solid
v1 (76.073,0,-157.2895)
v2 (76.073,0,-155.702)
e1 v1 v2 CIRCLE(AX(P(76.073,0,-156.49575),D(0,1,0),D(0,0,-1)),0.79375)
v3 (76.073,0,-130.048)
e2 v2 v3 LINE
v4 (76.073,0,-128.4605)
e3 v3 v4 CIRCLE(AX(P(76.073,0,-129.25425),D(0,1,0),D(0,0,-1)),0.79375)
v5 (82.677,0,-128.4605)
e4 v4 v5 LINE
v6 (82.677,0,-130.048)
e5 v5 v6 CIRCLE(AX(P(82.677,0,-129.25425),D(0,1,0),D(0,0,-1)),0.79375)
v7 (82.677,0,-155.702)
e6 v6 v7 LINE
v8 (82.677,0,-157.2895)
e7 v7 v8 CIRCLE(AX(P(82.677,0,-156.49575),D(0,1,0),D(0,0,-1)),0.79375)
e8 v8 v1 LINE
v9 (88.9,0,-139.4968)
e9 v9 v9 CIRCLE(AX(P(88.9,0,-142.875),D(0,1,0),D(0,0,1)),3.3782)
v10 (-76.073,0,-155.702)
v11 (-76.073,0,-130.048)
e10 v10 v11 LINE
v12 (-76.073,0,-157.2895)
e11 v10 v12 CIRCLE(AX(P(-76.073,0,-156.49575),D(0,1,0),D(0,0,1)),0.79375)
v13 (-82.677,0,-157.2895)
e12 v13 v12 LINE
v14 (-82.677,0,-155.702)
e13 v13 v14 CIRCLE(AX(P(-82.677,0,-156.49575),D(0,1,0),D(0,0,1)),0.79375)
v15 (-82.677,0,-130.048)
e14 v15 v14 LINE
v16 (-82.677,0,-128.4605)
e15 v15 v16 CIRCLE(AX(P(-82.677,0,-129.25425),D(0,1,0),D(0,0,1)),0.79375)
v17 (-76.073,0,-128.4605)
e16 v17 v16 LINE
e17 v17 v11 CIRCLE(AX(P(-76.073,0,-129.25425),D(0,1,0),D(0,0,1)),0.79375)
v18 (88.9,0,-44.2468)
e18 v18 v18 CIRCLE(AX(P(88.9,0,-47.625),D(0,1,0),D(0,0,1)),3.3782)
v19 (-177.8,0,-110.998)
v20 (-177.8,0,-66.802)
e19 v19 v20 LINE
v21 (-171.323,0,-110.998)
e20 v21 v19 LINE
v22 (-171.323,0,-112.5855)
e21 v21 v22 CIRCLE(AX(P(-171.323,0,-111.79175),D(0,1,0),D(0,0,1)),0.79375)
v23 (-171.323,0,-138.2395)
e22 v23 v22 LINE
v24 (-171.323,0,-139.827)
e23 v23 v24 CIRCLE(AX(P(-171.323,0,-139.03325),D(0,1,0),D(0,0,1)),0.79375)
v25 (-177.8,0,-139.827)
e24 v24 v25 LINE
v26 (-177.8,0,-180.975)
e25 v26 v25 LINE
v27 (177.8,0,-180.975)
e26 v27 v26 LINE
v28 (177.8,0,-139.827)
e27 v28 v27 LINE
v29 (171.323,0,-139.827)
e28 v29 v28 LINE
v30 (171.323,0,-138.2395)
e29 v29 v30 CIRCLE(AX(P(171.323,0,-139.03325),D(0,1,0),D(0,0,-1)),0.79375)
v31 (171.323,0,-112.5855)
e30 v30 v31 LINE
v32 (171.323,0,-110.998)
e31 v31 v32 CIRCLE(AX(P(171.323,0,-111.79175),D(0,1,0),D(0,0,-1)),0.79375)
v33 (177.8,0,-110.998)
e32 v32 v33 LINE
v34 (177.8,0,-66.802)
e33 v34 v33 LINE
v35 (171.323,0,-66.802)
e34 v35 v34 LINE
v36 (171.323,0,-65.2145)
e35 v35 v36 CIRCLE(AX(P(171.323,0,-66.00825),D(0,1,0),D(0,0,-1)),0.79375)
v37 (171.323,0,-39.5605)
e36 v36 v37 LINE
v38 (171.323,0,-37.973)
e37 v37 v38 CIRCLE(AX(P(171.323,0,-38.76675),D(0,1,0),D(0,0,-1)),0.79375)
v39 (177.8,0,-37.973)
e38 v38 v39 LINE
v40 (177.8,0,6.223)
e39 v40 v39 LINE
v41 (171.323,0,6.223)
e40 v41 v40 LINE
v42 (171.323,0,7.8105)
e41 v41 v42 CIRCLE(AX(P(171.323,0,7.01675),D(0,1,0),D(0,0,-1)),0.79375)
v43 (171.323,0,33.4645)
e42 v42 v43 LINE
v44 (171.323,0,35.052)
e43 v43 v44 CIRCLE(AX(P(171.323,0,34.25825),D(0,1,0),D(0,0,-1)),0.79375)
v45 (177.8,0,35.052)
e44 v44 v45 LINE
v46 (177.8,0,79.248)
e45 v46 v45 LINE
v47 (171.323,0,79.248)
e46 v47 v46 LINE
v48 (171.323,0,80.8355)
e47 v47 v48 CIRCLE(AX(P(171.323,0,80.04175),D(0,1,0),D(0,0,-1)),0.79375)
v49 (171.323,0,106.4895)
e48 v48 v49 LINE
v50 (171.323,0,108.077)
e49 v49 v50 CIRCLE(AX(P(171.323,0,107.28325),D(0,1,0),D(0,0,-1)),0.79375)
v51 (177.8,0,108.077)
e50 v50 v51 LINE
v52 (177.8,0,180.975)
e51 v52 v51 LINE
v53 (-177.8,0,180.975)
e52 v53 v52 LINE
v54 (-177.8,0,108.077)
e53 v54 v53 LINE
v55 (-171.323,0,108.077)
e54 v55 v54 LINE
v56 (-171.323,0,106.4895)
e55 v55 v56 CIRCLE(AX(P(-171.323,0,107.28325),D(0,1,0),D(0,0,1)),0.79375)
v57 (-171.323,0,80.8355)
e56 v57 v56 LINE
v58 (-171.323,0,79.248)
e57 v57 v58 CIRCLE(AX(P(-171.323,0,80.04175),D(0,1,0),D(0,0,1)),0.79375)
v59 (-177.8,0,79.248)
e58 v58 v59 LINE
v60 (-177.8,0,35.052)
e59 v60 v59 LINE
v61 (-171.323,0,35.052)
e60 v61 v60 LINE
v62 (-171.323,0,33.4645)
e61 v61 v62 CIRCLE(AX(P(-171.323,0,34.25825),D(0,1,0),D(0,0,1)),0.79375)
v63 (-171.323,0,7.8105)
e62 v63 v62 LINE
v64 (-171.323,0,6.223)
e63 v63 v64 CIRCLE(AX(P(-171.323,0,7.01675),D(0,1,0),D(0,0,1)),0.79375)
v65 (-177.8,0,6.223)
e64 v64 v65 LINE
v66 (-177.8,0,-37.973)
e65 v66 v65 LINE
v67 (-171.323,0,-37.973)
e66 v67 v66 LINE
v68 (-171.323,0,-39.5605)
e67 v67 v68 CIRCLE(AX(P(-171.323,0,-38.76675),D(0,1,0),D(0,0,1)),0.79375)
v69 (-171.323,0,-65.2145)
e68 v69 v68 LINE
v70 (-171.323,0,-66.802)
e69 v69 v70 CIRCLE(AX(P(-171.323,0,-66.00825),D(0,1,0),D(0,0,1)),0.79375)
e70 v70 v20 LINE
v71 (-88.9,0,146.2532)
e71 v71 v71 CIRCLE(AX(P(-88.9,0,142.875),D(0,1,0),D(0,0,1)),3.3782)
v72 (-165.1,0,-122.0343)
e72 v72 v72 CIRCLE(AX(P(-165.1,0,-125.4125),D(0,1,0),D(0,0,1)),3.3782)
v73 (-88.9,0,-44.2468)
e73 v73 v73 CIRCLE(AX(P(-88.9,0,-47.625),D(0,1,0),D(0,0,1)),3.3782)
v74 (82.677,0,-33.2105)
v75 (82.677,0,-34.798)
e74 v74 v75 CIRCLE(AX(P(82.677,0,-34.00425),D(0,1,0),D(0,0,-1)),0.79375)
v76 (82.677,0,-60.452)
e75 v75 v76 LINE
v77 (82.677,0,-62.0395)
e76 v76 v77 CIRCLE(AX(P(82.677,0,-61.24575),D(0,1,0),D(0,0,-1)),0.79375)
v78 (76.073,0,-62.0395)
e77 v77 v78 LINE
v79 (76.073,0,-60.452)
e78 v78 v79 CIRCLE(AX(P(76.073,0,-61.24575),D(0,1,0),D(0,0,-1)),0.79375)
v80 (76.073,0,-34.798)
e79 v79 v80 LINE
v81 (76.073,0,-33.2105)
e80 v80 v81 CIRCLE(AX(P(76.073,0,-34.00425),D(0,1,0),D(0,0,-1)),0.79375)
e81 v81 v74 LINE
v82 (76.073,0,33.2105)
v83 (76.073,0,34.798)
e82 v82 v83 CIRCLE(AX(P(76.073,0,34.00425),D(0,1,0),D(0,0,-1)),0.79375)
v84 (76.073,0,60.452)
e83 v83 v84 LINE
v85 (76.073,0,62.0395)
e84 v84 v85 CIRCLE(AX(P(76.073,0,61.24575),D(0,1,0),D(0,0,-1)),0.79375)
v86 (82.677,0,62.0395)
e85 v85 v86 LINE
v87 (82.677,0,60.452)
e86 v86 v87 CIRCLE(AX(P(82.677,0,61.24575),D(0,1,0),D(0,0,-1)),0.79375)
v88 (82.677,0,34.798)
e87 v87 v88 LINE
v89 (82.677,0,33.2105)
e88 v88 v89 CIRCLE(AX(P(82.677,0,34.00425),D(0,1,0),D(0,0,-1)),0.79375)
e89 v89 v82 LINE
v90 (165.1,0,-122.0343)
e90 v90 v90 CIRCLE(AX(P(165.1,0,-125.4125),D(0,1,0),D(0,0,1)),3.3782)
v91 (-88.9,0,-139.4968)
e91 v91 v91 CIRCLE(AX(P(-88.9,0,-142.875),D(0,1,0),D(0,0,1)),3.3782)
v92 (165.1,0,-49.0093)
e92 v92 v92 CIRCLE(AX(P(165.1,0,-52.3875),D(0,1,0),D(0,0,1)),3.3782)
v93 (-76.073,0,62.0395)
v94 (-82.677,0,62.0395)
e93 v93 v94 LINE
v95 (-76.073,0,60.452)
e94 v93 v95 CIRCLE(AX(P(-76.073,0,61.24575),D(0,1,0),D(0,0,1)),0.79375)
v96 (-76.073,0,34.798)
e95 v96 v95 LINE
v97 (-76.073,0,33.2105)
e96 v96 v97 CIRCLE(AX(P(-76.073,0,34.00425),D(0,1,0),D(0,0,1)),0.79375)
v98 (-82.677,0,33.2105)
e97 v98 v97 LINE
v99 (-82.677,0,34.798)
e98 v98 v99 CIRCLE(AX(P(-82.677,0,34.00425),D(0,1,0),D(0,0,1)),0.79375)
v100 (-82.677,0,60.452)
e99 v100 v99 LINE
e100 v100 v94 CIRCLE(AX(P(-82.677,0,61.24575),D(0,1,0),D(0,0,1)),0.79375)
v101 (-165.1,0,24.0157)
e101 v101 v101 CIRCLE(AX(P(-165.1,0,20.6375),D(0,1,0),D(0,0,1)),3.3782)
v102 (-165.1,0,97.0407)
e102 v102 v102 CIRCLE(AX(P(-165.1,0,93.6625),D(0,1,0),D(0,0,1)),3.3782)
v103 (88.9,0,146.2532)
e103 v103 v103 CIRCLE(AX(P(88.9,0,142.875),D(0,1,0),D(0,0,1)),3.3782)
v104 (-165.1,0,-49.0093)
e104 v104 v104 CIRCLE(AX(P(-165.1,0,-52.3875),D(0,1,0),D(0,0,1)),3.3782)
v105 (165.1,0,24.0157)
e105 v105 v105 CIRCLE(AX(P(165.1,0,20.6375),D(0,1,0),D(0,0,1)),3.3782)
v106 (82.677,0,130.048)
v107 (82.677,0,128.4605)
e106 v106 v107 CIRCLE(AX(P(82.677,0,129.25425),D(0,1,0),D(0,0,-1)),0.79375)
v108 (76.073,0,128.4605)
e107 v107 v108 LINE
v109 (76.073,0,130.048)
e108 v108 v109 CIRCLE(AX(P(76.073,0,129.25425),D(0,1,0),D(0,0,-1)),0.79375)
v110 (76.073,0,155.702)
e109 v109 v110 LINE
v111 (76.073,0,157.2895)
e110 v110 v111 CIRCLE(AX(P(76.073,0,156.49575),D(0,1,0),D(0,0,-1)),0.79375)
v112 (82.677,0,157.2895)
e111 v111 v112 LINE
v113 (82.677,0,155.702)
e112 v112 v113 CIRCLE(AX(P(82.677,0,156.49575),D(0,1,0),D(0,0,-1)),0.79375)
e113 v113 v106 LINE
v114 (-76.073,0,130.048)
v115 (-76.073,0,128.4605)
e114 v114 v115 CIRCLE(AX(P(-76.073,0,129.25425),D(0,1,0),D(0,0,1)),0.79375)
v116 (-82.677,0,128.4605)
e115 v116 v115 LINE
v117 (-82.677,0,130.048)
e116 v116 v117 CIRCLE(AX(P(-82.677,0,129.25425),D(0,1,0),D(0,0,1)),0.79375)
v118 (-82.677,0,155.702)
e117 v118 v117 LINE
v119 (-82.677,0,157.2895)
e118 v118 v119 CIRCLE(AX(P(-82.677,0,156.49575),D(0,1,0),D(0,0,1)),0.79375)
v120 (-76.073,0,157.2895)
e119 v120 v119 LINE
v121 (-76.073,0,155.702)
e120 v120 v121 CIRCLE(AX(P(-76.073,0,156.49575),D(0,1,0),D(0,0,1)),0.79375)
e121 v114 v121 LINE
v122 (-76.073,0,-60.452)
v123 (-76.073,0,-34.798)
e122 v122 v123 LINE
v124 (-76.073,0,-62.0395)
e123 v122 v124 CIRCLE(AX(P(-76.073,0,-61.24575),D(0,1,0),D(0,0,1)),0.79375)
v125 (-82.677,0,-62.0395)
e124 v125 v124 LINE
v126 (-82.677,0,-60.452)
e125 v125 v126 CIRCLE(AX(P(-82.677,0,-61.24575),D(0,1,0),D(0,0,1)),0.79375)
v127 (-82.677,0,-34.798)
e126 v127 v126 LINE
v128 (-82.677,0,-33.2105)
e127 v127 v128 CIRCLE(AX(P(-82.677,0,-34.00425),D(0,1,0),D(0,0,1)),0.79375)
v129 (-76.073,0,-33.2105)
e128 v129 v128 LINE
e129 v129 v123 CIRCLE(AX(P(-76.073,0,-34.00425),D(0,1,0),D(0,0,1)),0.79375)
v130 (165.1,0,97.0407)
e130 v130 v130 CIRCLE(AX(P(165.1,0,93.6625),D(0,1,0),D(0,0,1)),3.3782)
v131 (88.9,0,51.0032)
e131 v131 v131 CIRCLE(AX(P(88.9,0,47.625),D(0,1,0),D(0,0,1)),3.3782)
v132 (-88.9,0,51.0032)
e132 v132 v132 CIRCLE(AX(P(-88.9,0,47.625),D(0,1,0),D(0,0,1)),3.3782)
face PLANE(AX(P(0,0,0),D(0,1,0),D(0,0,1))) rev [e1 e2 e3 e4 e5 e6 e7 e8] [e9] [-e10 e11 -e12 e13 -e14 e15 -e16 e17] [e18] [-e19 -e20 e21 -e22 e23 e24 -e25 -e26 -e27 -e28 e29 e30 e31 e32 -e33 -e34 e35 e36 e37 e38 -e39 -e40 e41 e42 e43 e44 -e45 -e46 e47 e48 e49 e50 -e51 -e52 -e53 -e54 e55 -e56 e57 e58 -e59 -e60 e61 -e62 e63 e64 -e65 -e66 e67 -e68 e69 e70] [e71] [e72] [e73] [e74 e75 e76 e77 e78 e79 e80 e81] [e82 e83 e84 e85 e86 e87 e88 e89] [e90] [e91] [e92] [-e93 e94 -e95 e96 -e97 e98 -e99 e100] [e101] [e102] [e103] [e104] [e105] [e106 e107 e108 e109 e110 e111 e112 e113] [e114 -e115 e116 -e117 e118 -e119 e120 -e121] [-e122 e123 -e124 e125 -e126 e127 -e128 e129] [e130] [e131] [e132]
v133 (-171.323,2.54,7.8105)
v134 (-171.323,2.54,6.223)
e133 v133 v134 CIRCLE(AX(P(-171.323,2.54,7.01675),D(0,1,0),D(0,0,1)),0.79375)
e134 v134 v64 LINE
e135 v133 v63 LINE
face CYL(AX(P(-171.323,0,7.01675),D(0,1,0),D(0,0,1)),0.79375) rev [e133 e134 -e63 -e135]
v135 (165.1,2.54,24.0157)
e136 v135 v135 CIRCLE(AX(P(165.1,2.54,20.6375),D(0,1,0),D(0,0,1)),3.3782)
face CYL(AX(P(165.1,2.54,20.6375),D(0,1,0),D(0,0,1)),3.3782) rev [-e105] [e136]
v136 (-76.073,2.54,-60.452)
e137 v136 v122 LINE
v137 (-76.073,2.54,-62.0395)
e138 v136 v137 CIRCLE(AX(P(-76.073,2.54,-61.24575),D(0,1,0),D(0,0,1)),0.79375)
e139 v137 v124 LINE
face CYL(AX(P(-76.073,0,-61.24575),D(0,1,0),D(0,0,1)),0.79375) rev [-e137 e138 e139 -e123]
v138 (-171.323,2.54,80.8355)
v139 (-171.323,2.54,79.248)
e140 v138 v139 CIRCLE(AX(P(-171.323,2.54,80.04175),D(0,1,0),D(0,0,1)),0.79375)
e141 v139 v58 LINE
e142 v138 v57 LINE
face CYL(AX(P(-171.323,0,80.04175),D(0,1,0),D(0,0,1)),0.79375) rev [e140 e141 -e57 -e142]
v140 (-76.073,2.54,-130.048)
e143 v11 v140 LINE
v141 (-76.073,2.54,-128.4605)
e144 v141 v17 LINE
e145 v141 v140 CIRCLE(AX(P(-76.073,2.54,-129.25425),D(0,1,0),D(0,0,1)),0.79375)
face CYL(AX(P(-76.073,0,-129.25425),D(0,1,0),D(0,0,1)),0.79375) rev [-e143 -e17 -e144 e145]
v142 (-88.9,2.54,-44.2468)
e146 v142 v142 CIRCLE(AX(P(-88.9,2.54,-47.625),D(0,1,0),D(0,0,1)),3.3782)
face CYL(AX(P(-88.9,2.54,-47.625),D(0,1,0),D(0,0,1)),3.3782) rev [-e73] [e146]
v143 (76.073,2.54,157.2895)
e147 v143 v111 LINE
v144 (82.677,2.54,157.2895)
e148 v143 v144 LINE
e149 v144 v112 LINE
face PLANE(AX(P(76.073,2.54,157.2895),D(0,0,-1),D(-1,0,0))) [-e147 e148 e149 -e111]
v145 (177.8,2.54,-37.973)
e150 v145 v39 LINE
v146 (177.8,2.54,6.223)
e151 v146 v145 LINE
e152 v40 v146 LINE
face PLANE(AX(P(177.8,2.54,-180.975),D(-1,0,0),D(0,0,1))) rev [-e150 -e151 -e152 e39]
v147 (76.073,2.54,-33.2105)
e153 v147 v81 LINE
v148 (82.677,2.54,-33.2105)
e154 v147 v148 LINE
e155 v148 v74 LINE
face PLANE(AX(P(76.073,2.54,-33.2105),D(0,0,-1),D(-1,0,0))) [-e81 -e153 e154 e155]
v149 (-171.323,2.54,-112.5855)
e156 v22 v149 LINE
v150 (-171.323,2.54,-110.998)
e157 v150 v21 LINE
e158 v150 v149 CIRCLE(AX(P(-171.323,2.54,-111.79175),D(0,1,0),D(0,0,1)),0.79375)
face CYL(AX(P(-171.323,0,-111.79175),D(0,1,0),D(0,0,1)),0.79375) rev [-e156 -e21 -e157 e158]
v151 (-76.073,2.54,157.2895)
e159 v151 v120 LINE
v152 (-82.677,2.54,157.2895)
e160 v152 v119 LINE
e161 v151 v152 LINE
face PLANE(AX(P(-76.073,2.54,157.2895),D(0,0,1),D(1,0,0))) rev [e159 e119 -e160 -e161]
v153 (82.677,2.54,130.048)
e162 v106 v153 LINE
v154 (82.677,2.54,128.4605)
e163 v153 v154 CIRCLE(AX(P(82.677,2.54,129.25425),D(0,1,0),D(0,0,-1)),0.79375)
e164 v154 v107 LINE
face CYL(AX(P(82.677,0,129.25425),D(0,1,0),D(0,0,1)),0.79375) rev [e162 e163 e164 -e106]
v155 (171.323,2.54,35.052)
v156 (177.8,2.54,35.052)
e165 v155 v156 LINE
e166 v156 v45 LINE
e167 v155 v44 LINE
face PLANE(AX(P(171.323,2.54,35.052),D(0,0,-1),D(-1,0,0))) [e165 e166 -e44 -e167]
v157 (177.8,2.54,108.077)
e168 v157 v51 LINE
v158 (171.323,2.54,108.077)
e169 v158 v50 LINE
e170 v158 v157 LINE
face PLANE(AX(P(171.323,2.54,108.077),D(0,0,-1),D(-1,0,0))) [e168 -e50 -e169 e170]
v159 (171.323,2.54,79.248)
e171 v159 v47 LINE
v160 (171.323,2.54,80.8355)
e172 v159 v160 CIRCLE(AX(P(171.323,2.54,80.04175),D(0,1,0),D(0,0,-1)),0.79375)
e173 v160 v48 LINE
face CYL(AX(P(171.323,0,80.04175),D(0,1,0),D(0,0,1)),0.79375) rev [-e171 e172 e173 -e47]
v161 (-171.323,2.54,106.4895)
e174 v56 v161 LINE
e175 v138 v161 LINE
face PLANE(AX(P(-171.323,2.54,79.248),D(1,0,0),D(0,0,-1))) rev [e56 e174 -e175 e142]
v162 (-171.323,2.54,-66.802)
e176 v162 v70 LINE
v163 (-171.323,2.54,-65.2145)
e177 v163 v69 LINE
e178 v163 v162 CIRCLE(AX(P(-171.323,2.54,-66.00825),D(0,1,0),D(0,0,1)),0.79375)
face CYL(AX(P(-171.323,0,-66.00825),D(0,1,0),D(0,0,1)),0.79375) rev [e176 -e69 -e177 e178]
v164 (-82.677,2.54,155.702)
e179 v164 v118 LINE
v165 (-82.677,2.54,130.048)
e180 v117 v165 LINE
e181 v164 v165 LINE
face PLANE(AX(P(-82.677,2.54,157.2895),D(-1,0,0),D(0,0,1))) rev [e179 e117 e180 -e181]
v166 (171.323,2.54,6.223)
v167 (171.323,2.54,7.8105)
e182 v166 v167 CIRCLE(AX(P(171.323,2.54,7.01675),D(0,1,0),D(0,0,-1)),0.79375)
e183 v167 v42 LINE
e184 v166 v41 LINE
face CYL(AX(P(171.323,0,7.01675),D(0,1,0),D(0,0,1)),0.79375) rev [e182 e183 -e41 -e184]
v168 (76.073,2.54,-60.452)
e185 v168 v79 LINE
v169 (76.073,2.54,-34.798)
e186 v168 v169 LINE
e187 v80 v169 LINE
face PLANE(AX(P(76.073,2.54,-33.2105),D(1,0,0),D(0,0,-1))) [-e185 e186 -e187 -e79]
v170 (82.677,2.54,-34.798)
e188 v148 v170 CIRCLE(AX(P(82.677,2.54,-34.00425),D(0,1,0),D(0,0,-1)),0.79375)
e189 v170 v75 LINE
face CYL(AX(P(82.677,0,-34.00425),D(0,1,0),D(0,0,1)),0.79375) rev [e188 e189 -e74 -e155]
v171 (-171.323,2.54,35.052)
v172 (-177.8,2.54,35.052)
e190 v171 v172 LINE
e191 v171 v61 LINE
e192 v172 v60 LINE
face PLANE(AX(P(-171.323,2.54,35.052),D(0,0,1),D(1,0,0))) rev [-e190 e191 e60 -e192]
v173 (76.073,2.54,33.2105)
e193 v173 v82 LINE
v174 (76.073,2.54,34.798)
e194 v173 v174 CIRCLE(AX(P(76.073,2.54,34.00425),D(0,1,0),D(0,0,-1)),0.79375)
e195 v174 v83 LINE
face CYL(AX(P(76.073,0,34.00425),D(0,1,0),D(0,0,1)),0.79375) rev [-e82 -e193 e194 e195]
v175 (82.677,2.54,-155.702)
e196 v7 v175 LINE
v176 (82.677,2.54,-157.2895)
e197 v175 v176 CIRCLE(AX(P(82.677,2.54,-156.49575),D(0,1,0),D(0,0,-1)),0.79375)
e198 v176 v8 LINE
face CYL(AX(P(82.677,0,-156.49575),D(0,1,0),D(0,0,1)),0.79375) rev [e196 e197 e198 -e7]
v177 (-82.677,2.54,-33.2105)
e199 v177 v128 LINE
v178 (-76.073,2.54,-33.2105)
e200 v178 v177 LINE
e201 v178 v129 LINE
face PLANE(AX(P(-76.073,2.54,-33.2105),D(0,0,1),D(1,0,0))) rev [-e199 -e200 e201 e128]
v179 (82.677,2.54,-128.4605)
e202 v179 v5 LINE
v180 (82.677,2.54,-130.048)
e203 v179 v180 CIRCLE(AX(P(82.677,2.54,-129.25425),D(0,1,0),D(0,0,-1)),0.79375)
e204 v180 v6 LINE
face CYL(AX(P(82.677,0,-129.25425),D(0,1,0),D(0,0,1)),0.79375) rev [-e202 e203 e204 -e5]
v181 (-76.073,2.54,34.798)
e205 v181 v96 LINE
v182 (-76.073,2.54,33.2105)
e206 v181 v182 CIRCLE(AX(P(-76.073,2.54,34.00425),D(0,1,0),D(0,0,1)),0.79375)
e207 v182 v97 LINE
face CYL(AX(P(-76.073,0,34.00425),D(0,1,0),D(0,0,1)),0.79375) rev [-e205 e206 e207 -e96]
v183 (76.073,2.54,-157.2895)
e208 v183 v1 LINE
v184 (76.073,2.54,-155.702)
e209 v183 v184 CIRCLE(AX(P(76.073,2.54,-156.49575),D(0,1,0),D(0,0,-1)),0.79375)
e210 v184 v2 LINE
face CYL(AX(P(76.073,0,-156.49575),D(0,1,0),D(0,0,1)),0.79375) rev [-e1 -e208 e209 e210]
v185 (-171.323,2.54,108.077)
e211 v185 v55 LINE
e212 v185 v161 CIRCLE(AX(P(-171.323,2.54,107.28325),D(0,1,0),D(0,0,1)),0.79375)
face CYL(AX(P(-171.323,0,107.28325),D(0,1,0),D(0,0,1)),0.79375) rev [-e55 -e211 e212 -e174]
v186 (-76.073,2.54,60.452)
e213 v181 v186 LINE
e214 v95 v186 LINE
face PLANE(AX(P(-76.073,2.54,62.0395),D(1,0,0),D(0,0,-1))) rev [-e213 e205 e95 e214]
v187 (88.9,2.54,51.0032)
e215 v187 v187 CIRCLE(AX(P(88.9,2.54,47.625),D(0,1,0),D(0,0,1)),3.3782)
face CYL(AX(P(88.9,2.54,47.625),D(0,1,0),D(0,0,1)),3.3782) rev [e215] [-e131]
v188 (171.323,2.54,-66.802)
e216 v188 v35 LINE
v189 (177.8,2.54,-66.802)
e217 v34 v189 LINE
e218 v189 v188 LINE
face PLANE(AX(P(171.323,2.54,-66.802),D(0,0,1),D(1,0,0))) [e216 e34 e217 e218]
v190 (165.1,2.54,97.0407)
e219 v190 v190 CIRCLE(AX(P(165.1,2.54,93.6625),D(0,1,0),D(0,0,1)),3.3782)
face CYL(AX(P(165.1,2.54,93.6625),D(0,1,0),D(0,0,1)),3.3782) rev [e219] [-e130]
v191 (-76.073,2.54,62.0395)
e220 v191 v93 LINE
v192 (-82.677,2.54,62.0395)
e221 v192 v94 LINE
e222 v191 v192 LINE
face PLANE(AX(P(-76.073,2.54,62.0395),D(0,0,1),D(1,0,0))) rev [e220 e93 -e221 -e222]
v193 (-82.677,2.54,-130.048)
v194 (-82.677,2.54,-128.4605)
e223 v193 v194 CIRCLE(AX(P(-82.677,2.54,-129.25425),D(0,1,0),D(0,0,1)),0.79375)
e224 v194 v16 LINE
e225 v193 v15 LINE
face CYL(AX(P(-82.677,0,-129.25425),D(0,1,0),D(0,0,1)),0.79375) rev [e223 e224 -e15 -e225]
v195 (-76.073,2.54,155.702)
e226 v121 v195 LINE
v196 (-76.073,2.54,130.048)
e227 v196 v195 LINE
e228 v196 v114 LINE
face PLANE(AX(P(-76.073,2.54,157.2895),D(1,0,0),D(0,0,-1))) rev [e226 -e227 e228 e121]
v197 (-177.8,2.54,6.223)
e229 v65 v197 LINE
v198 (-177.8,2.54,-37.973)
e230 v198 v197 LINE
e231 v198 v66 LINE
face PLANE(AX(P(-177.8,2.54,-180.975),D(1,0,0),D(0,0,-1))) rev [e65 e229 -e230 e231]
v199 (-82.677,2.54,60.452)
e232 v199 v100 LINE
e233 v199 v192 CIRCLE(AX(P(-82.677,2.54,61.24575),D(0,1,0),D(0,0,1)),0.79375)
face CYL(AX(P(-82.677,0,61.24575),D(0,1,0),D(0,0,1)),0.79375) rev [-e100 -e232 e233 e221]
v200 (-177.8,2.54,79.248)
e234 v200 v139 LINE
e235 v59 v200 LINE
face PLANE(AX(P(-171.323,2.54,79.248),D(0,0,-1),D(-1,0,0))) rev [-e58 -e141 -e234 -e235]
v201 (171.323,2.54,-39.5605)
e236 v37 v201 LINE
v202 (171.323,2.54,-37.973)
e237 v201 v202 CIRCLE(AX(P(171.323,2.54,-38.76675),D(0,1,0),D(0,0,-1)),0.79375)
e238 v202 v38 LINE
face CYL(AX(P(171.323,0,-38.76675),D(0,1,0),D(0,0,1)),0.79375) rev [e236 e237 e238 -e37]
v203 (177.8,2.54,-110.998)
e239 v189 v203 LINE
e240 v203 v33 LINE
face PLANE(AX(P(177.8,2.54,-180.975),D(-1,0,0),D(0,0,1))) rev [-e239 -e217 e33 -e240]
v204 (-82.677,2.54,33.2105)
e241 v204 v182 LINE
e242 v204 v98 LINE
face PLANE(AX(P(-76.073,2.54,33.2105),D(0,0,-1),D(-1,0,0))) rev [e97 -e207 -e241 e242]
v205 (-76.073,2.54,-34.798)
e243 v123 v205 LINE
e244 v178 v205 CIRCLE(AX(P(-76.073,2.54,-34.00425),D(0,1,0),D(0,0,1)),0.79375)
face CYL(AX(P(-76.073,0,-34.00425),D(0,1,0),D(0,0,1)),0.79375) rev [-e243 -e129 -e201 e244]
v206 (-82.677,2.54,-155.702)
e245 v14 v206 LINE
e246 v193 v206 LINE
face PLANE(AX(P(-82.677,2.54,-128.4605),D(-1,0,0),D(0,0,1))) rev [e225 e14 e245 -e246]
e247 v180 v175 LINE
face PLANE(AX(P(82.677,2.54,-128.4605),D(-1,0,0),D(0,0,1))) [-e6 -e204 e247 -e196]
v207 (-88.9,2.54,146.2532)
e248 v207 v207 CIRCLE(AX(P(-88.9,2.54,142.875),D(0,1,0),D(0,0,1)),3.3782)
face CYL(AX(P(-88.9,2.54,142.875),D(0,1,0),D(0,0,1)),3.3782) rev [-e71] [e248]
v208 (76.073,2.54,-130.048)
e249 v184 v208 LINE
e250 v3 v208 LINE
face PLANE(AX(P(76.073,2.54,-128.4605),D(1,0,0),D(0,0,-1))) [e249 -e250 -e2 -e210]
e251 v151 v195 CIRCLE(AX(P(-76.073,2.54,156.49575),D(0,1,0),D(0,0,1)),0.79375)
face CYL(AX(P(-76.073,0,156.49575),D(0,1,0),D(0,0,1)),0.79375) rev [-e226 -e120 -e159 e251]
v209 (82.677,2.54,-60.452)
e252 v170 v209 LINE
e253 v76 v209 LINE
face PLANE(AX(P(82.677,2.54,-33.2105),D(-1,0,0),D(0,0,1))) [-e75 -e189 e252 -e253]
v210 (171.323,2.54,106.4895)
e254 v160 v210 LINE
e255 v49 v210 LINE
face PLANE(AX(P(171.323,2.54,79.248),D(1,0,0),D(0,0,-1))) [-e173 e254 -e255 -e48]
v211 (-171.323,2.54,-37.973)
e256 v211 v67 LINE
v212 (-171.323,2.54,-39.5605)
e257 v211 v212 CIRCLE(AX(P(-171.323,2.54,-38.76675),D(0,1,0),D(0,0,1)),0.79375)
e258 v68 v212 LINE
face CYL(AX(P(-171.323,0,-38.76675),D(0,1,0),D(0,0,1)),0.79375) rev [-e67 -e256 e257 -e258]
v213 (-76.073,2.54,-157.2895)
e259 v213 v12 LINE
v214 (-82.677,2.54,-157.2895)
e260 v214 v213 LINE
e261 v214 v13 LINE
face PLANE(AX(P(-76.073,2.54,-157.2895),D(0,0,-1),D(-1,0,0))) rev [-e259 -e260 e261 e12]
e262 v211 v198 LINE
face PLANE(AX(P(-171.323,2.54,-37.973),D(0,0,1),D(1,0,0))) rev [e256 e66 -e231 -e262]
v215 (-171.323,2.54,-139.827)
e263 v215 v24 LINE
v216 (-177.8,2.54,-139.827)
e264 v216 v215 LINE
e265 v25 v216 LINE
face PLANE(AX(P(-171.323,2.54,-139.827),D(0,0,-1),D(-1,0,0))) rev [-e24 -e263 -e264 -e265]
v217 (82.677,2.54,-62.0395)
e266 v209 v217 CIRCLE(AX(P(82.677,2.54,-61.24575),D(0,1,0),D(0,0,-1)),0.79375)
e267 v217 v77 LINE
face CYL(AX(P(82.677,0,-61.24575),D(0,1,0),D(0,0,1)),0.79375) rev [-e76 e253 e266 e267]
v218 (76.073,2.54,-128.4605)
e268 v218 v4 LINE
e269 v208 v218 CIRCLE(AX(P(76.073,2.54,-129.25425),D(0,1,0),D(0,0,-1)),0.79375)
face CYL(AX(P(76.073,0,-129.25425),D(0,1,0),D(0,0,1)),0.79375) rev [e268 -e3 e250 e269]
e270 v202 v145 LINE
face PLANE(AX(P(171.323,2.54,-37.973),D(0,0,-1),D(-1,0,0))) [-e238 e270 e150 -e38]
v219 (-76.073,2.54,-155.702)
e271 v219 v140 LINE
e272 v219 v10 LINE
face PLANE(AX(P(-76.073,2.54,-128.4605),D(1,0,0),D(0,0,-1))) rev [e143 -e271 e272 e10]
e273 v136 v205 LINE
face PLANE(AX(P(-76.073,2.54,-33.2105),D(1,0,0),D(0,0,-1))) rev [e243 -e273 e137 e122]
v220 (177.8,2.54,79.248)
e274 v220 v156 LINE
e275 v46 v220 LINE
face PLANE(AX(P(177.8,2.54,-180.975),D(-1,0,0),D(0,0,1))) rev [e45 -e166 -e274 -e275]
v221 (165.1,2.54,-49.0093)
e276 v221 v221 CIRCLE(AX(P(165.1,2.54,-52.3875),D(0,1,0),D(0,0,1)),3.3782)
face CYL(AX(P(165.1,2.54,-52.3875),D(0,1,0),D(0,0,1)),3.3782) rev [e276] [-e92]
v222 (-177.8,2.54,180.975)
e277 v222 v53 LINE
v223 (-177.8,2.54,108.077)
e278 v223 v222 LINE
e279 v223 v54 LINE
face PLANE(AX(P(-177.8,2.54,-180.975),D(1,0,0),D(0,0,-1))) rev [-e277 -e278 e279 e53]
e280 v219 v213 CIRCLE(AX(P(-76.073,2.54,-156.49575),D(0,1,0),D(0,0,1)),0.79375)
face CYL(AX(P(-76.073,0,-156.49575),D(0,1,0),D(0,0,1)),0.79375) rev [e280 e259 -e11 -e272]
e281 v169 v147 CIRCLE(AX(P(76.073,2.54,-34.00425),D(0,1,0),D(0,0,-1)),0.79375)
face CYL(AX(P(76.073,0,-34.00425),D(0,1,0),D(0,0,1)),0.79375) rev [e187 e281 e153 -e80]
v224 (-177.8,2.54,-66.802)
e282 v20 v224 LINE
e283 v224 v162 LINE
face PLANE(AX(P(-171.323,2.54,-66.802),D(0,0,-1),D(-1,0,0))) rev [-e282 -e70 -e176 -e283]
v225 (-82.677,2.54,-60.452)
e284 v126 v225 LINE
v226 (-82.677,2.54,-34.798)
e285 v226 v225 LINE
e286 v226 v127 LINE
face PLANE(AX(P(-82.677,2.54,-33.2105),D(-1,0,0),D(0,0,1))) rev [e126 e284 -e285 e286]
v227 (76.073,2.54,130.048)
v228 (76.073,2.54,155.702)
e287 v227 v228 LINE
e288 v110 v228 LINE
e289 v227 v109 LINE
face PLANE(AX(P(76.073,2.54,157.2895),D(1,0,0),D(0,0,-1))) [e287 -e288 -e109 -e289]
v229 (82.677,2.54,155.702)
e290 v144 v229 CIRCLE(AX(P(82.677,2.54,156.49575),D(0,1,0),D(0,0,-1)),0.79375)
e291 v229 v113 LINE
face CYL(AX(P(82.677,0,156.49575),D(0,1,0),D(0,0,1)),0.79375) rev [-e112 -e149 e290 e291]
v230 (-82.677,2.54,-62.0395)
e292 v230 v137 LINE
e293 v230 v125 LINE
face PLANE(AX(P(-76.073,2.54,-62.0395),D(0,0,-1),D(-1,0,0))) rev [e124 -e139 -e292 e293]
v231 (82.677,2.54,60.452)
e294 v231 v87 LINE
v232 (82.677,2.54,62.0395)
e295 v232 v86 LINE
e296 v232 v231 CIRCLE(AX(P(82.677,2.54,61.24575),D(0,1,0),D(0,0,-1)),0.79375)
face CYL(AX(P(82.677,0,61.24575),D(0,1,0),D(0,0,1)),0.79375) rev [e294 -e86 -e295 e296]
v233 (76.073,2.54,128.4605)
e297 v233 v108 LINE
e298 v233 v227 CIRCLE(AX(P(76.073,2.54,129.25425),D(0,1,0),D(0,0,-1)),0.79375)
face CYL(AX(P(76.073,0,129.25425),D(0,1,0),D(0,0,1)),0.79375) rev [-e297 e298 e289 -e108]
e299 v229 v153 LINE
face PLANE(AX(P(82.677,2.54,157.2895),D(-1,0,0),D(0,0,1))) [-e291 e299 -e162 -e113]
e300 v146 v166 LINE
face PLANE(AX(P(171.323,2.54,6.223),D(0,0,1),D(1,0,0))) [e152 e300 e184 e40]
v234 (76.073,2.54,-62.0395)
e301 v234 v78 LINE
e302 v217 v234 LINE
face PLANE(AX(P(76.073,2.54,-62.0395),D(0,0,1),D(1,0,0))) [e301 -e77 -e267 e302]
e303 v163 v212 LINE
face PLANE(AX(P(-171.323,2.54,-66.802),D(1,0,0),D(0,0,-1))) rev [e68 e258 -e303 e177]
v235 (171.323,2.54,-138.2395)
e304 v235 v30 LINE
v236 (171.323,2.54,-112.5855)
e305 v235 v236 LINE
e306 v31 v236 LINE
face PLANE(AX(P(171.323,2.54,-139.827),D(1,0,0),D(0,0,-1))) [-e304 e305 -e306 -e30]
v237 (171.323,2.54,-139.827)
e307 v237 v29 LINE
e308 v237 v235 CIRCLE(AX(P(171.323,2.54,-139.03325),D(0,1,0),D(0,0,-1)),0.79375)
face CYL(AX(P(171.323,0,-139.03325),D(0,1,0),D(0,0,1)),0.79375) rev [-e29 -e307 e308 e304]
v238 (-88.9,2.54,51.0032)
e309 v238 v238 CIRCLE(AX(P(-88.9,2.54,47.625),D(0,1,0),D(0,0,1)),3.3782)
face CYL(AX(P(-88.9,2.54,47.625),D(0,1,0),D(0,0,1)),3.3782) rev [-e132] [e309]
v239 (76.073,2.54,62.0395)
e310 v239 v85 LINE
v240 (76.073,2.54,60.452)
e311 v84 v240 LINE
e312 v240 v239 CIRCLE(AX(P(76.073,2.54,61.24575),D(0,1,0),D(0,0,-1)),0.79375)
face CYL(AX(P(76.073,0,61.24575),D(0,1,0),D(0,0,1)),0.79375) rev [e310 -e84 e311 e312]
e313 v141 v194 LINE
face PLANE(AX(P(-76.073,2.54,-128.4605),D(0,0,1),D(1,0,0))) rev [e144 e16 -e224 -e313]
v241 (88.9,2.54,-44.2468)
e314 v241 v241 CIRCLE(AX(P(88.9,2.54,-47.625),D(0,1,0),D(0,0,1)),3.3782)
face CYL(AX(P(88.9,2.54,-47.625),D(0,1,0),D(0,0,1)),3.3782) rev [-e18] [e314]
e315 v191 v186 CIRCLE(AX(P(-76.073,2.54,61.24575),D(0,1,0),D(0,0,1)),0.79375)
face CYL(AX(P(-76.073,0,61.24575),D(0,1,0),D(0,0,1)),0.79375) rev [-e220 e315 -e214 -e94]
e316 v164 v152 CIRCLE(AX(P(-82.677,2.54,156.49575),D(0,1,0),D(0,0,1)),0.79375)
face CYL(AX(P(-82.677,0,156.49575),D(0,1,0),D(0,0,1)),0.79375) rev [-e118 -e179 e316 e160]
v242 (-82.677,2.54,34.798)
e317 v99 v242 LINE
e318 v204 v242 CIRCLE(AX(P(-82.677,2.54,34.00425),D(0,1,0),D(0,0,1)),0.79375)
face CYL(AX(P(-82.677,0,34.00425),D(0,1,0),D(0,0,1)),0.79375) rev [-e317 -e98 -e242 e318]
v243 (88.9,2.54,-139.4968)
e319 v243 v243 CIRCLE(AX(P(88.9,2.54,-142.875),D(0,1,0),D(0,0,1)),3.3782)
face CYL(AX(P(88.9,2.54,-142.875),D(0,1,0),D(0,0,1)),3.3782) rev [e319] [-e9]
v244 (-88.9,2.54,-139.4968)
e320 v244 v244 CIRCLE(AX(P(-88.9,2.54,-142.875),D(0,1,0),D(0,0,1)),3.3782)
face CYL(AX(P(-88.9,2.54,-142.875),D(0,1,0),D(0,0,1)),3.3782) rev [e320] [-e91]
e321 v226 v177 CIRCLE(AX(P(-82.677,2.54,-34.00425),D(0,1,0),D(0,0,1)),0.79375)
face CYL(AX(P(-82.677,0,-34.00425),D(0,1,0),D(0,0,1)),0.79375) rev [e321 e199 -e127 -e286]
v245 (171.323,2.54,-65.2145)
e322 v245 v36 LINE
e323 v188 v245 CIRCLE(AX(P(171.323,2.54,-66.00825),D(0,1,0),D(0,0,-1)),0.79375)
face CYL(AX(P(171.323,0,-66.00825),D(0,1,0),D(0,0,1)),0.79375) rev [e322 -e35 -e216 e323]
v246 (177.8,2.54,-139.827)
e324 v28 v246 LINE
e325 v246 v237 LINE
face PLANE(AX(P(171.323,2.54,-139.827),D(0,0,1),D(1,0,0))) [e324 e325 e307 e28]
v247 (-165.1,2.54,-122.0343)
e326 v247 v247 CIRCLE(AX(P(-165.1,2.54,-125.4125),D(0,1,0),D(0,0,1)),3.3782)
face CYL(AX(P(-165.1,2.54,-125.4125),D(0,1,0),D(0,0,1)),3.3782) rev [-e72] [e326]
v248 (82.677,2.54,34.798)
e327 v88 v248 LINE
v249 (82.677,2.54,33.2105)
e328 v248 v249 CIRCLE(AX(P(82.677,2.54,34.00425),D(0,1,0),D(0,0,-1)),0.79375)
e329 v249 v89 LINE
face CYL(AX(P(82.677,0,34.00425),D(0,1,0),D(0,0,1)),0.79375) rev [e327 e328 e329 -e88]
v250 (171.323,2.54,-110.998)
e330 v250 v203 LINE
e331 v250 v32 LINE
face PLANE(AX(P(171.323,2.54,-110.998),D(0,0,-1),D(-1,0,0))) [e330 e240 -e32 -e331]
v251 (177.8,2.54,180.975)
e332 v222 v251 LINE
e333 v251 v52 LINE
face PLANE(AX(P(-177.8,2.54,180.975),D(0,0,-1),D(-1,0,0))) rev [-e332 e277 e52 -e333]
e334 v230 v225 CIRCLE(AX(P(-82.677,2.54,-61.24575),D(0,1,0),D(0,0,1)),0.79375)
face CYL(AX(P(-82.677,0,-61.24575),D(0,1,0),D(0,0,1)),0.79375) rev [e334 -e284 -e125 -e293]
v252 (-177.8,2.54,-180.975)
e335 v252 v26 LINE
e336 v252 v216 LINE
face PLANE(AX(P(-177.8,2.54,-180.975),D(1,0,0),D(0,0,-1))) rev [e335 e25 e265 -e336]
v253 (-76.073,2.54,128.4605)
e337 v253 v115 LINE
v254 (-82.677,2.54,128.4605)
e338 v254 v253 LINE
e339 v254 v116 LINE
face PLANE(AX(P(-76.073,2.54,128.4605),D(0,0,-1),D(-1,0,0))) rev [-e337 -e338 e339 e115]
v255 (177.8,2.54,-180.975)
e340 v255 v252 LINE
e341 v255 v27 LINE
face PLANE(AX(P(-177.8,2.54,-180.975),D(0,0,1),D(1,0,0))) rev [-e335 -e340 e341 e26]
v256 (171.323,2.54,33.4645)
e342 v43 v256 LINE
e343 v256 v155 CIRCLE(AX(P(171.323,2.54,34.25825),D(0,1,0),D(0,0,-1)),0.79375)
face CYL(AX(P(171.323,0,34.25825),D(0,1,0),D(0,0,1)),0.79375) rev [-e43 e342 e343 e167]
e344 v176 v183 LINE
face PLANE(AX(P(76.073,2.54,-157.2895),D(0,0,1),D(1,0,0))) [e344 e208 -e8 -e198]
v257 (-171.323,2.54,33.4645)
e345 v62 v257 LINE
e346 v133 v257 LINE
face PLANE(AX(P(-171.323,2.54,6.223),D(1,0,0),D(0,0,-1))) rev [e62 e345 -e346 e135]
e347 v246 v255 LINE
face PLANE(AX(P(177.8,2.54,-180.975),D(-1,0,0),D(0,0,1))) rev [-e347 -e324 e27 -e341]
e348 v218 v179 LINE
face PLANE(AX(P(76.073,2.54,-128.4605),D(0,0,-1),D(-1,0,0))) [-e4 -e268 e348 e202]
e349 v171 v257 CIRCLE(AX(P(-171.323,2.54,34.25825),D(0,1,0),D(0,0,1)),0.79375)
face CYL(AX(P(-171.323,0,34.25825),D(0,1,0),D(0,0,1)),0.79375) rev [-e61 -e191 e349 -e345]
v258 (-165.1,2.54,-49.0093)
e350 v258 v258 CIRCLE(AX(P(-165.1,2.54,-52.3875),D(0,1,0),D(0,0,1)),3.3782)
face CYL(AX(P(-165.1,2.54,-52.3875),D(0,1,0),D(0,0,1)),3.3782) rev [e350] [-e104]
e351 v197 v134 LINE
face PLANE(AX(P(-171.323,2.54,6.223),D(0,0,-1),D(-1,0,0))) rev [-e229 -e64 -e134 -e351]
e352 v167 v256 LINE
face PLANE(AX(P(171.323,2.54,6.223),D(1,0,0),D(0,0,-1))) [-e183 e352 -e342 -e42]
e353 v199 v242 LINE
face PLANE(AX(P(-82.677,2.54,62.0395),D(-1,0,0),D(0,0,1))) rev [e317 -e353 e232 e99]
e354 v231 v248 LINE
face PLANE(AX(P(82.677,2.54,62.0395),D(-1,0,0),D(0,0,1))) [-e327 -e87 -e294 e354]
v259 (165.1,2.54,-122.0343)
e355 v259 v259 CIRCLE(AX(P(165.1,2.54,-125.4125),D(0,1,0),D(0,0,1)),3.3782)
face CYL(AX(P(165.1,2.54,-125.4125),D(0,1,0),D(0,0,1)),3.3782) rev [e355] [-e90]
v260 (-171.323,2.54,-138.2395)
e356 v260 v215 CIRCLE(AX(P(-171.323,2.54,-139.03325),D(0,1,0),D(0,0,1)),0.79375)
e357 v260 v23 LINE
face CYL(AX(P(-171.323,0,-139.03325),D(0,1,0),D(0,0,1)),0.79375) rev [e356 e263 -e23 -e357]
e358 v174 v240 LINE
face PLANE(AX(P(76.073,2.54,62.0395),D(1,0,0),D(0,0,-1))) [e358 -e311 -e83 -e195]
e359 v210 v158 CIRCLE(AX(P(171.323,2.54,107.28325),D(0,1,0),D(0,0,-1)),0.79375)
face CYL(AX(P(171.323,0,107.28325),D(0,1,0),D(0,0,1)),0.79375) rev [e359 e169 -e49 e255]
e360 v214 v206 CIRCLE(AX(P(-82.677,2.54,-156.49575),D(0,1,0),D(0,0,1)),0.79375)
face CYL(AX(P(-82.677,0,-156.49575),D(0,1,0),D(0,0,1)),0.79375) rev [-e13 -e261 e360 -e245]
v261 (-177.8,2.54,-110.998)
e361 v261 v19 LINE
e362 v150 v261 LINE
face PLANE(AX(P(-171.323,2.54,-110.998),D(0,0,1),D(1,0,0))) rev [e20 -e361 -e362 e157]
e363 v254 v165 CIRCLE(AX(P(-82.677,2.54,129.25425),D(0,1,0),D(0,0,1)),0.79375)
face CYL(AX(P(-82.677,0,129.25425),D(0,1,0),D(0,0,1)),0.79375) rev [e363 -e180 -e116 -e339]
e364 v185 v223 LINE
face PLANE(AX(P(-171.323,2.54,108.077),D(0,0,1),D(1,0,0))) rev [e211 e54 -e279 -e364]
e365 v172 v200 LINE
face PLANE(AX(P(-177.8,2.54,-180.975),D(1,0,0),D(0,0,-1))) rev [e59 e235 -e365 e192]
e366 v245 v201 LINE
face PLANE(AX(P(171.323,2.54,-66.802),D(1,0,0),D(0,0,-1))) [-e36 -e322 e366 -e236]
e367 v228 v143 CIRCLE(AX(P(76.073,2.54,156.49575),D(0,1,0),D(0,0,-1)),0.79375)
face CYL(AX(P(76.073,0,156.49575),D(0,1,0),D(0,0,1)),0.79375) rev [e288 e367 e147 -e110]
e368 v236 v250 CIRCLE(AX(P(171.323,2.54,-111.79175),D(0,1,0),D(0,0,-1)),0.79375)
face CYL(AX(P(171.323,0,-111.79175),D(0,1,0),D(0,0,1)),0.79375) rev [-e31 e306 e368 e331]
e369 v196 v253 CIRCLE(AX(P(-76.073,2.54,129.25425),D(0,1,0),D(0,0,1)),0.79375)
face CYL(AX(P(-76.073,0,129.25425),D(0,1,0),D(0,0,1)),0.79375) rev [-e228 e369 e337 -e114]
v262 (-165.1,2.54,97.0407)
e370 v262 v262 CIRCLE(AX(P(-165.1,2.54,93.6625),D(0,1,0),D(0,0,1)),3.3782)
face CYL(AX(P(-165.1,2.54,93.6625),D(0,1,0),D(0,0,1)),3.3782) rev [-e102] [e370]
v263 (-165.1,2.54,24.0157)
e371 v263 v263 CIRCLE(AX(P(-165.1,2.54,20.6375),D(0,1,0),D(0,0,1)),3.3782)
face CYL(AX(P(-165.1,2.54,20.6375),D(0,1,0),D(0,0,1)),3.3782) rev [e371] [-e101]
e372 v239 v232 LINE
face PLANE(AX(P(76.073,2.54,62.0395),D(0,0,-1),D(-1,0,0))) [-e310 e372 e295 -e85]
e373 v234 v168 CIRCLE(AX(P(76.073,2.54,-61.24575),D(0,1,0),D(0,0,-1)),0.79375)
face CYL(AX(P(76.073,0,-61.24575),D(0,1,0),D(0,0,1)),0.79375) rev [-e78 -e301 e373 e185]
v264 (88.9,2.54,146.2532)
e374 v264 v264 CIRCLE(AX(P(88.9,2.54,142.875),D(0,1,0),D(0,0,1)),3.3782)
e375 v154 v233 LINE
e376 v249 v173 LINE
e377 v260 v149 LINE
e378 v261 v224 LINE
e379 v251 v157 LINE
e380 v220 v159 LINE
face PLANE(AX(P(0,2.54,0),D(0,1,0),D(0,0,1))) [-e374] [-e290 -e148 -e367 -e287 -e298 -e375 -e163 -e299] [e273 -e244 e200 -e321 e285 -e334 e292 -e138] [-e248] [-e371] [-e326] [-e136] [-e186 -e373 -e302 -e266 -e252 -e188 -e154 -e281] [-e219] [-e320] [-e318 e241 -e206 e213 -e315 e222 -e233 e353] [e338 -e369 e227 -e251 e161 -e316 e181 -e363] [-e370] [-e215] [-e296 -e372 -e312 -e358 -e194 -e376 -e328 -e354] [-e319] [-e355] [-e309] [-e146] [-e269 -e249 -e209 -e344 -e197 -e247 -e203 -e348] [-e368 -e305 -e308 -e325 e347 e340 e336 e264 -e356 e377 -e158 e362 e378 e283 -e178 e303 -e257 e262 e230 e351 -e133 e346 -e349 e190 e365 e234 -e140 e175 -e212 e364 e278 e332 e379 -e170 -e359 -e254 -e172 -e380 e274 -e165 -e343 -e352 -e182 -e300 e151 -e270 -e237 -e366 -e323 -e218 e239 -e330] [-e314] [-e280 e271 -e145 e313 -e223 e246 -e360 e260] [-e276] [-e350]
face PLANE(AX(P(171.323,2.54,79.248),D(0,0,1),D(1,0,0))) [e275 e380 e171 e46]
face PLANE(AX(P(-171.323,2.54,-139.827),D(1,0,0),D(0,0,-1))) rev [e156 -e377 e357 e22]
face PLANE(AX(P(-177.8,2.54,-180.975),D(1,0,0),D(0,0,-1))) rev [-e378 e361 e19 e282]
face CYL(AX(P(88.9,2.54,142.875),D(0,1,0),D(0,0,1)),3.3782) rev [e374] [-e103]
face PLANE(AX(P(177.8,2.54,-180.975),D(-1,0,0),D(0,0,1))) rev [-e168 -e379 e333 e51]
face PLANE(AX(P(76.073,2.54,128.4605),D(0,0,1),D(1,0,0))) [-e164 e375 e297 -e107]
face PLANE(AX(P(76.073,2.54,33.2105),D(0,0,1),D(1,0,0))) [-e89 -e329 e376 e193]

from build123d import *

# Parameters (mm, degrees)
SKETCH1_W               = 355.6
SKETCH1_H               = 361.95
BOSS_EXTRUDE1_DEPTH     = 2.54
F_1_4_CLEARANCE_HOLE1_D = 6.7564
SKETCH9_W               = 6.604
SKETCH9_H               = 28.829
SKETCH9_W_2             = 6.35
SKETCH9_H_2             = 28.575
CUT_EXTRUDE1_DEPTH      = 254.714883728
MIRROR1_OUTLINE_W       = 6.477
MIRROR1_OUTLINE_H       = 28.829
MIRROR1_OUTLINE_W_2     = 6.604
MIRROR1_OUTLINE_R       = 3.3782
MIRROR1_DEPTH           = 2.54
SKETCH10_R              = 0.79375
CUT_EXTRUDE2_DEPTH      = 254.714883728


# Read off the part's stored shape, not the designer's step: Mirror1
with BuildPart() as part:
    # Sketch1 → Boss-Extrude1 (new body)
    with BuildSketch(Plane(origin=(0, 0, 0), x_dir=(1, 0, 0), z_dir=(0, 1, 0))):
        Rectangle(SKETCH1_W, SKETCH1_H)
    extrude(amount=BOSS_EXTRUDE1_DEPTH)

    # 1/4 Clearance Hole1 (through all)
    with Locations(Plane(origin=(0, 2.54, 0), x_dir=(1, 0, 0), z_dir=(0, 1, 0))):
        with Locations((-165.1, 125.4125), (-88.9, 142.875), (-88.9, 47.625), (-165.1, 52.3875), (-165.1, -20.6375), (-88.9, -47.625), (-88.9, -142.875), (-165.1, -93.6625)):
            Hole(F_1_4_CLEARANCE_HOLE1_D / 2)

    # Sketch9 → Cut-Extrude1 (cut, through all)
    # profile 1 of 8: a face of its own
    with BuildSketch(Plane(origin=(0, 0, 0), x_dir=(-1, 0, 0), z_dir=(0, -1, 0))):
        with Locations((174.625, -93.6625)):
            Rectangle(SKETCH9_W, SKETCH9_H)
        with Locations((174.625, -93.6625)):
            Rectangle(SKETCH9_W_2, SKETCH9_H_2, mode=Mode.SUBTRACT)
    # profile 2 of 8: a face of its own
    with BuildSketch(Plane(origin=(0, 0, 0), x_dir=(-1, 0, 0), z_dir=(0, -1, 0))):
        with Locations((174.625, -20.6375)):
            Rectangle(SKETCH9_W, SKETCH9_H)
        with Locations((174.625, -20.6375)):
            Rectangle(SKETCH9_W_2, SKETCH9_H_2, mode=Mode.SUBTRACT)
    # profile 3 of 8: a face of its own
    with BuildSketch(Plane(origin=(0, 0, 0), x_dir=(-1, 0, 0), z_dir=(0, -1, 0))):
        with Locations((174.625, 52.3875)):
            Rectangle(SKETCH9_W, SKETCH9_H)
        with Locations((174.625, 52.3875)):
            Rectangle(SKETCH9_W_2, SKETCH9_H_2, mode=Mode.SUBTRACT)
    # profile 4 of 8: a face of its own
    with BuildSketch(Plane(origin=(0, 0, 0), x_dir=(-1, 0, 0), z_dir=(0, -1, 0))):
        with Locations((174.625, 125.4125)):
            Rectangle(SKETCH9_W, SKETCH9_H)
        with Locations((174.625, 125.4125)):
            Rectangle(SKETCH9_W_2, SKETCH9_H_2, mode=Mode.SUBTRACT)
    # profile 5 of 8: a face of its own
    with BuildSketch(Plane(origin=(0, 0, 0), x_dir=(-1, 0, 0), z_dir=(0, -1, 0))):
        with Locations((79.375, 142.875)):
            Rectangle(SKETCH9_W, SKETCH9_H)
        with Locations((79.375, 142.875)):
            Rectangle(SKETCH9_W_2, SKETCH9_H_2, mode=Mode.SUBTRACT)
    # profile 6 of 8: a face of its own
    with BuildSketch(Plane(origin=(0, 0, 0), x_dir=(-1, 0, 0), z_dir=(0, -1, 0))):
        with Locations((79.375, 47.625)):
            Rectangle(SKETCH9_W, SKETCH9_H)
        with Locations((79.375, 47.625)):
            Rectangle(SKETCH9_W_2, SKETCH9_H_2, mode=Mode.SUBTRACT)
    # profile 7 of 8: a face of its own
    with BuildSketch(Plane(origin=(0, 0, 0), x_dir=(-1, 0, 0), z_dir=(0, -1, 0))):
        with Locations((79.375, -47.625)):
            Rectangle(SKETCH9_W, SKETCH9_H)
        with Locations((79.375, -47.625)):
            Rectangle(SKETCH9_W_2, SKETCH9_H_2, mode=Mode.SUBTRACT)
    # profile 8 of 8: a face of its own
    with BuildSketch(Plane(origin=(0, 0, 0), x_dir=(-1, 0, 0), z_dir=(0, -1, 0))):
        with Locations((79.375, -142.875)):
            Rectangle(SKETCH9_W, SKETCH9_H)
        with Locations((79.375, -142.875)):
            Rectangle(SKETCH9_W_2, SKETCH9_H_2, mode=Mode.SUBTRACT)
    extrude(amount=-CUT_EXTRUDE1_DEPTH, mode=Mode.SUBTRACT)


with BuildPart() as cut_extrude1_kept_piece:
    # of the separate pieces the step leaves, the one the design keeps (cut_extrude1_pieces_kept)
    add(part.part.solids().sort_by_distance((-177.8, 0, -180.975))[0])

    # Mirror1 outline → Mirror1 (cut)
    with BuildSketch(Plane(origin=(0, 0, 0), x_dir=(1, 0, 0), z_dir=(0, 1, 0))):
        with Locations((174.5615, 125.4125)):
            Rectangle(MIRROR1_OUTLINE_W, MIRROR1_OUTLINE_H)
        with Locations((174.5615, 52.3875)):
            Rectangle(MIRROR1_OUTLINE_W, MIRROR1_OUTLINE_H)
        with Locations((174.5615, -20.6375)):
            Rectangle(MIRROR1_OUTLINE_W, MIRROR1_OUTLINE_H)
        with Locations((174.5615, -93.6625)):
            Rectangle(MIRROR1_OUTLINE_W, MIRROR1_OUTLINE_H)
        with Locations((79.375, 142.875)):
            Rectangle(MIRROR1_OUTLINE_W_2, MIRROR1_OUTLINE_H)
        with Locations((79.375, 47.625)):
            Rectangle(MIRROR1_OUTLINE_W_2, MIRROR1_OUTLINE_H)
        with Locations((79.375, -47.625)):
            Rectangle(MIRROR1_OUTLINE_W_2, MIRROR1_OUTLINE_H)
        with Locations((79.375, -142.875)):
            Rectangle(MIRROR1_OUTLINE_W_2, MIRROR1_OUTLINE_H)
        with Locations((165.1, -93.6625)):
            Circle(MIRROR1_OUTLINE_R)
        with Locations((88.9, -142.875)):
            Circle(MIRROR1_OUTLINE_R)
        with Locations((88.9, -47.625)):
            Circle(MIRROR1_OUTLINE_R)
        with Locations((165.1, -20.6375)):
            Circle(MIRROR1_OUTLINE_R)
        with Locations((165.1, 52.3875)):
            Circle(MIRROR1_OUTLINE_R)
        with Locations((88.9, 47.625)):
            Circle(MIRROR1_OUTLINE_R)
        with Locations((88.9, 142.875)):
            Circle(MIRROR1_OUTLINE_R)
        with Locations((165.1, 125.4125)):
            Circle(MIRROR1_OUTLINE_R)
    extrude(amount=MIRROR1_DEPTH, mode=Mode.SUBTRACT)

    # Sketch10 → Cut-Extrude2 (cut, through all)
    with BuildSketch(Plane(origin=(0, 2.54, 0), x_dir=(1, 0, 0), z_dir=(0, 1, 0))):
        with Locations((-171.323, 139.03325)):
            Circle(SKETCH10_R)
        with Locations((-171.323, 111.79175)):
            Circle(SKETCH10_R)
        with Locations((-171.323, 66.00825)):
            Circle(SKETCH10_R)
        with Locations((-171.323, 38.76675)):
            Circle(SKETCH10_R)
        with Locations((-82.677, 156.49575)):
            Circle(SKETCH10_R)
        with Locations((-76.073, 156.49575)):
            Circle(SKETCH10_R)
        with Locations((-76.073, 129.25425)):
            Circle(SKETCH10_R)
        with Locations((-82.677, 129.25425)):
            Circle(SKETCH10_R)
        with Locations((-82.677, 61.24575)):
            Circle(SKETCH10_R)
        with Locations((-76.073, 61.24575)):
            Circle(SKETCH10_R)
        with Locations((-76.073, 34.00425)):
            Circle(SKETCH10_R)
        with Locations((-82.677, 34.00425)):
            Circle(SKETCH10_R)
        with Locations((-171.323, -7.01675)):
            Circle(SKETCH10_R)
        with Locations((-171.323, -34.25825)):
            Circle(SKETCH10_R)
        with Locations((-82.677, -34.00425)):
            Circle(SKETCH10_R)
        with Locations((-76.073, -34.00425)):
            Circle(SKETCH10_R)
        with Locations((-76.073, -61.24575)):
            Circle(SKETCH10_R)
        with Locations((-82.677, -61.24575)):
            Circle(SKETCH10_R)
        with Locations((-171.323, -80.04175)):
            Circle(SKETCH10_R)
        with Locations((-171.323, -107.28325)):
            Circle(SKETCH10_R)
        with Locations((-82.677, -129.25425)):
            Circle(SKETCH10_R)
        with Locations((-76.073, -129.25425)):
            Circle(SKETCH10_R)
        with Locations((-76.073, -156.49575)):
            Circle(SKETCH10_R)
        with Locations((-82.677, -156.49575)):
            Circle(SKETCH10_R)
        with Locations((82.677, -156.49575)):
            Circle(SKETCH10_R)
        with Locations((76.073, -156.49575)):
            Circle(SKETCH10_R)
        with Locations((76.073, -129.25425)):
            Circle(SKETCH10_R)
        with Locations((82.677, -129.25425)):
            Circle(SKETCH10_R)
        with Locations((171.323, -107.28325)):
            Circle(SKETCH10_R)
        with Locations((171.323, -80.04175)):
            Circle(SKETCH10_R)
        with Locations((82.677, -61.24575)):
            Circle(SKETCH10_R)
        with Locations((76.073, -61.24575)):
            Circle(SKETCH10_R)
        with Locations((76.073, -34.00425)):
            Circle(SKETCH10_R)
        with Locations((82.677, -34.00425)):
            Circle(SKETCH10_R)
        with Locations((171.323, -34.25825)):
            Circle(SKETCH10_R)
        with Locations((171.323, -7.01675)):
            Circle(SKETCH10_R)
        with Locations((82.677, 34.00425)):
            Circle(SKETCH10_R)
        with Locations((76.073, 34.00425)):
            Circle(SKETCH10_R)
        with Locations((76.073, 61.24575)):
            Circle(SKETCH10_R)
        with Locations((82.677, 61.24575)):
            Circle(SKETCH10_R)
        with Locations((82.677, 129.25425)):
            Circle(SKETCH10_R)
        with Locations((76.073, 129.25425)):
            Circle(SKETCH10_R)
        with Locations((76.073, 156.49575)):
            Circle(SKETCH10_R)
        with Locations((82.677, 156.49575)):
            Circle(SKETCH10_R)
        with Locations((171.323, 38.76675)):
            Circle(SKETCH10_R)
        with Locations((171.323, 66.00825)):
            Circle(SKETCH10_R)
        with Locations((171.323, 111.79175)):
            Circle(SKETCH10_R)
        with Locations((171.323, 139.03325)):
            Circle(SKETCH10_R)
    extrude(amount=-CUT_EXTRUDE2_DEPTH, mode=Mode.SUBTRACT)


solid = cut_extrude1_kept_piece.part
